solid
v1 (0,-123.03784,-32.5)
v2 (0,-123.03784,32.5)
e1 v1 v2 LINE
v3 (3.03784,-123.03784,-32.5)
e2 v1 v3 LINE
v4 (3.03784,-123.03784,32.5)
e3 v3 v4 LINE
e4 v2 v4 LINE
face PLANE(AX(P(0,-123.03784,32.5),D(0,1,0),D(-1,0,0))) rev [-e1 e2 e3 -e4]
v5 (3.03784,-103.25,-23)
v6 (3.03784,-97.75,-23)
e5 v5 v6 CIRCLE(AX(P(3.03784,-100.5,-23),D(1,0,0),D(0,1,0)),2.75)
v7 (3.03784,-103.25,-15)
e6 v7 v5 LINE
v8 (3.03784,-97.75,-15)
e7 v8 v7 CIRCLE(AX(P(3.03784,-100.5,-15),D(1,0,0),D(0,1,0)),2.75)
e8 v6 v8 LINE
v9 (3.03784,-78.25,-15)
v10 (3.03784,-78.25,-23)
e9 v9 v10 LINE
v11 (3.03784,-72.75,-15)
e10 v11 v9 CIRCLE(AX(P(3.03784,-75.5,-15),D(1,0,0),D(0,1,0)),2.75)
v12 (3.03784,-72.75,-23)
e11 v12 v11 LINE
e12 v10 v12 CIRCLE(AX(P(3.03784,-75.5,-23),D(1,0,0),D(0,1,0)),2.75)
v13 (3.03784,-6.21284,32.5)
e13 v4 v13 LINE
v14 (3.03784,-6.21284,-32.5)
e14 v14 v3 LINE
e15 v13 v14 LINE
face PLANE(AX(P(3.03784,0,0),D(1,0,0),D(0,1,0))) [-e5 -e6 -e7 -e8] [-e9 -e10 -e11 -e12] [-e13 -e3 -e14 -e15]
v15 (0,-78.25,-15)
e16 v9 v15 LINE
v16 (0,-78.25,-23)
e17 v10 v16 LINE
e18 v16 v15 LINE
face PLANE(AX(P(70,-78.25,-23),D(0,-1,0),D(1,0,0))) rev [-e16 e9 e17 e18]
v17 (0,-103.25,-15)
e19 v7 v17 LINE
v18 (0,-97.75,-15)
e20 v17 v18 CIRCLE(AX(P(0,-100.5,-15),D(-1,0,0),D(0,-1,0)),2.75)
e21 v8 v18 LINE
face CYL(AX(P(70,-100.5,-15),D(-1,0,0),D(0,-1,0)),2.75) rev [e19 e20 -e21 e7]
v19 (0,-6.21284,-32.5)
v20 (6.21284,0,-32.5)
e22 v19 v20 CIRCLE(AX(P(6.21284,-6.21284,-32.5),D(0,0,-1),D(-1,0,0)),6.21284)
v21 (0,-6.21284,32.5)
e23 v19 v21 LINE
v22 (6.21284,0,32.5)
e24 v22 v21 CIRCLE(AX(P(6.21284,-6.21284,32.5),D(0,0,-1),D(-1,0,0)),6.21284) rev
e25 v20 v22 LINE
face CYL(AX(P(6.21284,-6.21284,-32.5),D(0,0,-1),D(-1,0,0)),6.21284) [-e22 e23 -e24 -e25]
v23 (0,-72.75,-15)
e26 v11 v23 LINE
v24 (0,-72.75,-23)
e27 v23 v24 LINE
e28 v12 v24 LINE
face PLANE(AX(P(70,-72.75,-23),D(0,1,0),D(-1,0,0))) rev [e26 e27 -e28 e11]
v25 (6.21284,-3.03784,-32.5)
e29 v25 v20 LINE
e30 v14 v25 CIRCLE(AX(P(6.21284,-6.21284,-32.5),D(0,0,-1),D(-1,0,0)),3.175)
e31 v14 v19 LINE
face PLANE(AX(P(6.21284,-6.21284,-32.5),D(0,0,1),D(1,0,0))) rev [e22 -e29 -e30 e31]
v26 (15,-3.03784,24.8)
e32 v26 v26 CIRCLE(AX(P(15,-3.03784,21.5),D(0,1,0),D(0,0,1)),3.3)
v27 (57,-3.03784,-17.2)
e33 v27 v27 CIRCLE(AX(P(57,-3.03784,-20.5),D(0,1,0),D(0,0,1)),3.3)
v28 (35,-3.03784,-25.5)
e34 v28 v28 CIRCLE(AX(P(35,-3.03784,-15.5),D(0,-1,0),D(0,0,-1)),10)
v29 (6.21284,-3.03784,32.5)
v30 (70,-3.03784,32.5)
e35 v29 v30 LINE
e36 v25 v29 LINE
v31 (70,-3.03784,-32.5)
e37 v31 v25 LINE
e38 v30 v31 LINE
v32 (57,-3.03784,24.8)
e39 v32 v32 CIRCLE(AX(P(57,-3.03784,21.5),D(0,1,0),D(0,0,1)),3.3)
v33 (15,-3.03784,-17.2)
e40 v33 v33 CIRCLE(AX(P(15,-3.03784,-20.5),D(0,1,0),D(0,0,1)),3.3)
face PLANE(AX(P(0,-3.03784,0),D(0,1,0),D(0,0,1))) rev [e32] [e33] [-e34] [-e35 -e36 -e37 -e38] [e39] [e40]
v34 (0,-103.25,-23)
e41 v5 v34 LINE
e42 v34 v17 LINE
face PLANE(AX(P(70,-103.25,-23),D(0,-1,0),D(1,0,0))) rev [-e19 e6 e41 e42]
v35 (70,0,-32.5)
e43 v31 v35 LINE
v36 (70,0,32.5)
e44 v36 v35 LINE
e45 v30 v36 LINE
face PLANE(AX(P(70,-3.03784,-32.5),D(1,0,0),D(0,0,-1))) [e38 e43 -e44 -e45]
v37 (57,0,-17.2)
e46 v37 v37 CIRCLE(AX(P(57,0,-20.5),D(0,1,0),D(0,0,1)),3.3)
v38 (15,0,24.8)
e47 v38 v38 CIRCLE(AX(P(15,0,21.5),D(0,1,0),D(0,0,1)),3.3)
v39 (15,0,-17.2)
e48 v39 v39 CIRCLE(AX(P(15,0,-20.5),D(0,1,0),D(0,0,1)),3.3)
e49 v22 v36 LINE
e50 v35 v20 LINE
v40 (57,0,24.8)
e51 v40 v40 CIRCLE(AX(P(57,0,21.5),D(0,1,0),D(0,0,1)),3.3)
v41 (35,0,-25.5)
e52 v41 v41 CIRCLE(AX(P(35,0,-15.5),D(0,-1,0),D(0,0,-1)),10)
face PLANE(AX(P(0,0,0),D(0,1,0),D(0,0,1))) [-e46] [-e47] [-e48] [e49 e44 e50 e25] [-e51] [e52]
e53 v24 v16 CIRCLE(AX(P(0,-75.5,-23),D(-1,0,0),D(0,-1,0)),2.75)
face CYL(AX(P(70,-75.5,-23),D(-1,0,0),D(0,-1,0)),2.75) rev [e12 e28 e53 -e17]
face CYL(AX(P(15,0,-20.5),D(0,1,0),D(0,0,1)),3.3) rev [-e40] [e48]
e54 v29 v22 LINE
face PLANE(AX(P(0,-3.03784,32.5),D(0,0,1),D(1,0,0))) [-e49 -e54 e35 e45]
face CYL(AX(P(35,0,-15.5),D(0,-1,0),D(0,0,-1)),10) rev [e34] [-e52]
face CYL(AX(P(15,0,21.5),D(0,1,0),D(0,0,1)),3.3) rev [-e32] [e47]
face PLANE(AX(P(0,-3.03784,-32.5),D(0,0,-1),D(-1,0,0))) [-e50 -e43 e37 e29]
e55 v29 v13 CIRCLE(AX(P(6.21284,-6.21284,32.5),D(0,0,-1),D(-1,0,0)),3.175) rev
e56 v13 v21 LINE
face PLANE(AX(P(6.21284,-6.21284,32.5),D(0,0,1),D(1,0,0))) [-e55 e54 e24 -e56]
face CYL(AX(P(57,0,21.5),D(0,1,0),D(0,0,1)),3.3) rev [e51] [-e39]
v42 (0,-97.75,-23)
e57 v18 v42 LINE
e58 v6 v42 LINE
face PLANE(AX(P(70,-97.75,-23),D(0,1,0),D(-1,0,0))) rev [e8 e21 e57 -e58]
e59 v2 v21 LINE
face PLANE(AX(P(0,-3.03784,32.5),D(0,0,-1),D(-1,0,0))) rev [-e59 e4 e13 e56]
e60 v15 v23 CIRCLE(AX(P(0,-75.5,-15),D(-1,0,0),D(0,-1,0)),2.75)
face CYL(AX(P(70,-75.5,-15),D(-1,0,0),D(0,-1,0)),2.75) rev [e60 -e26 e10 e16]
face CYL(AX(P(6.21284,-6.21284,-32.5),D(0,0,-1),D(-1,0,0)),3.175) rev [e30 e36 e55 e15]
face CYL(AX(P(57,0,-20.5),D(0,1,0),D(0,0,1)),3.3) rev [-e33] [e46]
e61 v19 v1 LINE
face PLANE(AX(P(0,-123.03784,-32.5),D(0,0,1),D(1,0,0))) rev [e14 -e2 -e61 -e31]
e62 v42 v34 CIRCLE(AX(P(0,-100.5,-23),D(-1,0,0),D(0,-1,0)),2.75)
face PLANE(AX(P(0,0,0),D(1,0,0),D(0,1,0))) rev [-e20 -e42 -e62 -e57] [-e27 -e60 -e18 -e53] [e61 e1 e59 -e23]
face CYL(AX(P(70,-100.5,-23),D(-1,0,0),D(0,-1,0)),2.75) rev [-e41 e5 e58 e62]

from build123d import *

# Parameters (mm, degrees)
SKETCH1_W                    = 70
SKETCH1_H                    = 65
BASE_FLANGE1_DEPTH           = 3.03784
EDGE_FLANGE1_STRIP_W         = 18.50136
EDGE_FLANGE1_STRIP_H         = 3.03784
EDGE_FLANGE1_STRIP_CUT_DEPTH = 65
EDGE_FLANGE1_DEPTH           = 65
CUT_EXTRUDE1_DEPTH           = 146.239664251
M6_CLEARANCE_HOLE1_D         = 6.6
SKETCH12_R                   = 10
CUT_EXTRUDE2_DEPTH           = 3.03784


# Sheet-metal steps are written as plain solids
with BuildPart() as part:
    # Sketch1 → Base-Flange1 (new body)
    with BuildSketch(Plane(origin=(0, 0, 0), x_dir=(1, 0, 0), z_dir=(0, 1, 0))):
        with Locations((35, 0)):
            Rectangle(SKETCH1_W, SKETCH1_H)
    extrude(amount=-BASE_FLANGE1_DEPTH)

    # Edge-Flange1 strip (across the edge) → Edge-Flange1 strip cut (cut)
    with BuildSketch(Plane(origin=(0, -3.03784, 32.5), x_dir=(1, 0, 0), z_dir=(0, 0, -1))):
        with Locations((-3.03784, -1.51892)):
            Rectangle(EDGE_FLANGE1_STRIP_W, EDGE_FLANGE1_STRIP_H)
    extrude(amount=EDGE_FLANGE1_STRIP_CUT_DEPTH, mode=Mode.SUBTRACT)

    # Edge-Flange1 section (across the edge) → Edge-Flange1 (add)
    with BuildSketch(Plane(origin=(0, -3.03784, 32.5), x_dir=(1, 0, 0), z_dir=(0, 0, -1))):
        with BuildLine():
            Line((0, 3.175), (0, 120))
            Line((0, 120), (3.03784, 120))
            Line((3.03784, 120), (3.03784, 3.175))
            ThreePointArc((3.03784, 3.175), (3.96777597, 0.92993597), (6.21284, 0))
            Line((6.21284, 0), (6.21284, -3.03784))
            ThreePointArc((6.21284, -3.03784), (1.819698706, -1.218141294), (0, 3.175))
        make_face()
    extrude(amount=EDGE_FLANGE1_DEPTH)

    # Sketch9 → Cut-Extrude1 (cut, through all)
    with BuildSketch(Plane.ZY):
        with BuildLine():
            Line((-23, -72.75), (-15, -72.75))
            ThreePointArc((-15, -72.75), (-12.25, -75.5), (-15, -78.25))
            Line((-15, -78.25), (-23, -78.25))
            ThreePointArc((-23, -78.25), (-25.75, -75.5), (-23, -72.75))
        make_face()
        with BuildLine():
            Line((-23, -97.75), (-15, -97.75))
            ThreePointArc((-15, -97.75), (-12.25, -100.5), (-15, -103.25))
            Line((-15, -103.25), (-23, -103.25))
            ThreePointArc((-23, -103.25), (-25.75, -100.5), (-23, -97.75))
        make_face()
    extrude(amount=-CUT_EXTRUDE1_DEPTH, mode=Mode.SUBTRACT)

    # M6 Clearance Hole1 (through all)
    with Locations(Plane(origin=(0, 0, 0), x_dir=(1, 0, 0), z_dir=(0, 1, 0))):
        with Locations((57, 20.5), (57, -21.5), (15, -21.5), (15, 20.5)):
            Hole(M6_CLEARANCE_HOLE1_D / 2)

    # Sketch12 → Cut-Extrude2 (cut)
    with BuildSketch(Plane.XZ.offset(3.03784)):
        with Locations(Location((35, -15.5, 0), (0, 0, 270))):
            Circle(SKETCH12_R)
    extrude(amount=-CUT_EXTRUDE2_DEPTH, mode=Mode.SUBTRACT)


solid = part.part
